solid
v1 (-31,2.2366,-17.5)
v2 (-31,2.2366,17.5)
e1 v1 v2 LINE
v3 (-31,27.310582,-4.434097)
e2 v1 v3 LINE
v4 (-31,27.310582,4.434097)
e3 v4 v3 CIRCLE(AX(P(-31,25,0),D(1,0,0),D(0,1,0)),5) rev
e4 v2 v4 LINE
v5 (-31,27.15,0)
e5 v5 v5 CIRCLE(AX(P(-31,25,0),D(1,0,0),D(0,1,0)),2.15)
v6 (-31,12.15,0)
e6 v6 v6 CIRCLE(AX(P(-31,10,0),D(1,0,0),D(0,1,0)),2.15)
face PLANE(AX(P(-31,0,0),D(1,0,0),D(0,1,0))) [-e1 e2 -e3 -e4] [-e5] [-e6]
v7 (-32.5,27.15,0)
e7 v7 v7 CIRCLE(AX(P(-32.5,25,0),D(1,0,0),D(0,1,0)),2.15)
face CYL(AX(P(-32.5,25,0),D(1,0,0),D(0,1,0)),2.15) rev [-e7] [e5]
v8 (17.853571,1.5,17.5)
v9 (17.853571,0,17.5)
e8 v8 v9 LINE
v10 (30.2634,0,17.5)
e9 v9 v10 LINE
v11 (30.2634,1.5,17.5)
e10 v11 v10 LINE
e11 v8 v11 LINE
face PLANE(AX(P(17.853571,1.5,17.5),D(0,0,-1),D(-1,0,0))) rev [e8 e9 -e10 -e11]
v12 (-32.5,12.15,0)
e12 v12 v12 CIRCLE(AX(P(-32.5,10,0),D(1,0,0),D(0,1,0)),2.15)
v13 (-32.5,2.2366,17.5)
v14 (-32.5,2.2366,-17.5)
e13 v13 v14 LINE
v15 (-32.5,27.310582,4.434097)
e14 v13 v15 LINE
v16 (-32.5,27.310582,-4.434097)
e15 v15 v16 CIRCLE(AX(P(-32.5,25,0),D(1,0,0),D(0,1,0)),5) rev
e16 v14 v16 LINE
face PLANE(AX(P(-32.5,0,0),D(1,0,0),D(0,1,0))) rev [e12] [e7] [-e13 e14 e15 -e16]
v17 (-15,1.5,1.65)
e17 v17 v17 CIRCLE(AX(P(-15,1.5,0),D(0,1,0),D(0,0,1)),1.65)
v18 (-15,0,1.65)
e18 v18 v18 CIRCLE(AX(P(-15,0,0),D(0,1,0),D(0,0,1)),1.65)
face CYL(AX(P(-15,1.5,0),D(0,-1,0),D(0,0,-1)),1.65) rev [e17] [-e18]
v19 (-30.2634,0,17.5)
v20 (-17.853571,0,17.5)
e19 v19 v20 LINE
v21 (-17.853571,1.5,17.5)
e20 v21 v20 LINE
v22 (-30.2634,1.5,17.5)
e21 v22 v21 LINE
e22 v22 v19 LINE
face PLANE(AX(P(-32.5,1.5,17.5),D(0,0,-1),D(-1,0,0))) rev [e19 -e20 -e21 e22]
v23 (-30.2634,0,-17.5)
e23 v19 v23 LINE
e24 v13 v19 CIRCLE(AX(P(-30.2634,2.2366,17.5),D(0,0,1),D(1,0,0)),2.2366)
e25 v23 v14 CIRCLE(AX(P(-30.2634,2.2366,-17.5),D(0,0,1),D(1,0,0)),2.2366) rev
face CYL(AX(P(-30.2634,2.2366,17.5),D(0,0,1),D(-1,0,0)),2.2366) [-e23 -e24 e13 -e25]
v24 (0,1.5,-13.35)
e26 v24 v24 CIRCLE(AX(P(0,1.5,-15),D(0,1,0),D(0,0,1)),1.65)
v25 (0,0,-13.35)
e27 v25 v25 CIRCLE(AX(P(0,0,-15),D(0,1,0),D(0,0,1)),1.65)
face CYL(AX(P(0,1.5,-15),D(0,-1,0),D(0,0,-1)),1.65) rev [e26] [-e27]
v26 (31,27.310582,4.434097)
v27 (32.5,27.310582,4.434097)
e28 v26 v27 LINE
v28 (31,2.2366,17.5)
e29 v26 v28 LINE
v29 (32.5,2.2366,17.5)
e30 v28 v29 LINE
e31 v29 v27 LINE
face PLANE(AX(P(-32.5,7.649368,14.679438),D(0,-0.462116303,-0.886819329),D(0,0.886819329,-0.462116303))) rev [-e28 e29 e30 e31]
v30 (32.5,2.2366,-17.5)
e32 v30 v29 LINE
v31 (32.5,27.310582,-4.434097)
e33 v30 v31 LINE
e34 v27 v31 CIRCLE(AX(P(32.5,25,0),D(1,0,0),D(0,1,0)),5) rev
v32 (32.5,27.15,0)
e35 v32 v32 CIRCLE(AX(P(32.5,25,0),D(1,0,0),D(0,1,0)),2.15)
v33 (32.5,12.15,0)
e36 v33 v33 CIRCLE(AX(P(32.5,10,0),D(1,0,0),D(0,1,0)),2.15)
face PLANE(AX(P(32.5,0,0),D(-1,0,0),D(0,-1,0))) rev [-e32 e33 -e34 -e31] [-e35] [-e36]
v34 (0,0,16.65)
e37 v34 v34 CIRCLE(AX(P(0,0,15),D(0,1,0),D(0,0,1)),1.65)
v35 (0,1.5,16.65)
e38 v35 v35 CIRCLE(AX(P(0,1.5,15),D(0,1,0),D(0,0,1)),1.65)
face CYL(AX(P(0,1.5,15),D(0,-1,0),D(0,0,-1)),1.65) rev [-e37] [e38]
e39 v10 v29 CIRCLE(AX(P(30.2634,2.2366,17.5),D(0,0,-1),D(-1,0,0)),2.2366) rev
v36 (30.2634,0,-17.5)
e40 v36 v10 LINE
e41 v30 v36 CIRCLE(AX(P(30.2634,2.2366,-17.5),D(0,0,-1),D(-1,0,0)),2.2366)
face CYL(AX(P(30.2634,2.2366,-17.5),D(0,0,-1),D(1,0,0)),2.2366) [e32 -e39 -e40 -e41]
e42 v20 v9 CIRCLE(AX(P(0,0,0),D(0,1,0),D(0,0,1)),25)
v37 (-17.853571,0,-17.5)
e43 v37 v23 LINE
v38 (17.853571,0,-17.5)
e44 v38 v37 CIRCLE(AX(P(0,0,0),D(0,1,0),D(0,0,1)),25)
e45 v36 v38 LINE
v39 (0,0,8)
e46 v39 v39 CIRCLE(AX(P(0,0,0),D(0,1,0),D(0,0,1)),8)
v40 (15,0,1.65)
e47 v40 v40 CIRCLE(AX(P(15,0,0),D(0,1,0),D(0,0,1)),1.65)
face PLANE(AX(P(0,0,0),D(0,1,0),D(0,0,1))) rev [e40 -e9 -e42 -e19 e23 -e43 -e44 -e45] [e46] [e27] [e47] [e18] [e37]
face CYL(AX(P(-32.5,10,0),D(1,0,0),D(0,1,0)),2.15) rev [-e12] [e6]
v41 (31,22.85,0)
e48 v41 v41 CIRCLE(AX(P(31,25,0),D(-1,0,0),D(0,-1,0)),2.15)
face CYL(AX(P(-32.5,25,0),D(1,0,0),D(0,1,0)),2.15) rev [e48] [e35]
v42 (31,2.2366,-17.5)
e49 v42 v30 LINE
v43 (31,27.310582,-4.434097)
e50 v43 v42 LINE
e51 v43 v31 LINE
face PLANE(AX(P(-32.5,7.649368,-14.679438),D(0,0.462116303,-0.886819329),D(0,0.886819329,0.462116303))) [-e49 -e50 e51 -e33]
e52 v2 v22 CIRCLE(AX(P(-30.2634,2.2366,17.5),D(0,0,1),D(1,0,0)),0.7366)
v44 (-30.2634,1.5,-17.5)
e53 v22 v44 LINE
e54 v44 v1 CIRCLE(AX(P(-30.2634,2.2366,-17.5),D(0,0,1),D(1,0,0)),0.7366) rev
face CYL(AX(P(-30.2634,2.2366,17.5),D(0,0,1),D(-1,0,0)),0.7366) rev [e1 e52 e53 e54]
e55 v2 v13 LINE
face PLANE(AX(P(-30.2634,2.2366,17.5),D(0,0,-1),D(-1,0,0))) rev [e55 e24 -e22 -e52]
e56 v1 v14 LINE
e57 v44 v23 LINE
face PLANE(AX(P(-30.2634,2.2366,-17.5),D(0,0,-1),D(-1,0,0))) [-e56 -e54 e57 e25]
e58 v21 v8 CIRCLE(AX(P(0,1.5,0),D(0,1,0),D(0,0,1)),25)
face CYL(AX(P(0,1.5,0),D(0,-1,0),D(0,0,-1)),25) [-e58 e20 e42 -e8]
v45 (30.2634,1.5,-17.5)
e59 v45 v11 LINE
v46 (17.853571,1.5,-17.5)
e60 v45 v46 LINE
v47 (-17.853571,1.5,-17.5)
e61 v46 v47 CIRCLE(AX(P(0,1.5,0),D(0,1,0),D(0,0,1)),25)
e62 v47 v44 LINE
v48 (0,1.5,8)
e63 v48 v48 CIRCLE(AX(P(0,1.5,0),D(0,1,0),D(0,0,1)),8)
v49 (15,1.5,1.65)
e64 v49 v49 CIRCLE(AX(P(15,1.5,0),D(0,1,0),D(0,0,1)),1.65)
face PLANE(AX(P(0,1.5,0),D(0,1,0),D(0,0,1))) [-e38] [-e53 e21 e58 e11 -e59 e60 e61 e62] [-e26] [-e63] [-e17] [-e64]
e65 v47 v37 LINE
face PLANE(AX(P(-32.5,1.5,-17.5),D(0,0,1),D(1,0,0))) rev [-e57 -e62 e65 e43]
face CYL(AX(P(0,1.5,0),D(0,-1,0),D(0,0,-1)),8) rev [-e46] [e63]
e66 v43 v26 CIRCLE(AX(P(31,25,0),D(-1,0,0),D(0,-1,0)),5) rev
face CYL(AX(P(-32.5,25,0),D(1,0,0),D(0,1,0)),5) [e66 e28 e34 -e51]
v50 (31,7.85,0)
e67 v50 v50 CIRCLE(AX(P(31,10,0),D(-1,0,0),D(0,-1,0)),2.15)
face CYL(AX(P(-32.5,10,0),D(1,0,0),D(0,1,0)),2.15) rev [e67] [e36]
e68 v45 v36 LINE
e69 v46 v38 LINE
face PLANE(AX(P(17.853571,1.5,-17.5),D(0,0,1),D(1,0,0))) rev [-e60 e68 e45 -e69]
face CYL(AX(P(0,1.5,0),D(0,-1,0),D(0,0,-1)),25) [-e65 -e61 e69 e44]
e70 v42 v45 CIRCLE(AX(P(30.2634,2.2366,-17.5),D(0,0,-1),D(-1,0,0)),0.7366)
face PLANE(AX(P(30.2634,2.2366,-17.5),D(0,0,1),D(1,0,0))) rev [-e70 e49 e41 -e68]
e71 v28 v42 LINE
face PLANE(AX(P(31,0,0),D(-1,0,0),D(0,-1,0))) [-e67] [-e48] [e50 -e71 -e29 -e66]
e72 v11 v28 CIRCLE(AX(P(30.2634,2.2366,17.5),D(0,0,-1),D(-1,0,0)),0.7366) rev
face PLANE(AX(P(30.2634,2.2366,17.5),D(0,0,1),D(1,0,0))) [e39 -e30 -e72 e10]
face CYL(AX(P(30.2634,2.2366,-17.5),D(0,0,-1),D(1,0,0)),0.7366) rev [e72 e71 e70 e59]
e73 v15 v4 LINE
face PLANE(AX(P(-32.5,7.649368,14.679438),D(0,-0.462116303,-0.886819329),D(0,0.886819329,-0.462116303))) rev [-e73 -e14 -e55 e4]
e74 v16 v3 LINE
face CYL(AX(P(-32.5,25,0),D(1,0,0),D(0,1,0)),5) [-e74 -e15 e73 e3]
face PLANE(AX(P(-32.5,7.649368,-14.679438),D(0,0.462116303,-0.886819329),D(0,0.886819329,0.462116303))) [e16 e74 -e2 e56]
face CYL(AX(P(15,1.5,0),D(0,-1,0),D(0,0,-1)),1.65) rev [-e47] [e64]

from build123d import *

# Parameters (mm, degrees)
SKETCH_6_R                         = 8
SKETCH_6_R_2                       = 1.65
SM_BASE_FLANGE_2_DEPTH             = 1.5
SM_EDGE_FLANGE_1_STRIP_W           = 7.4732
SM_EDGE_FLANGE_1_STRIP_H           = 1.5
SM_EDGE_FLANGE_1_STRIP_CUT_DEPTH   = 35
SM_EDGE_FLANGE_1_STRIP_2_W         = 7.4732
SM_EDGE_FLANGE_1_STRIP_2_H         = 1.5
SM_EDGE_FLANGE_1_STRIP_CUT_2_DEPTH = 35
SM_EDGE_FLANGE_1_DEPTH             = 35
SM_EDGE_FLANGE_1_BEND_DEPTH        = 35
CUT_EXTRUDE_1_DEPTH                = 76.828754441


# Sheet-metal steps are written as plain solids
with BuildPart() as part:
    # 草图6 → 基体-法兰2 (new body)
    with BuildSketch(Plane(origin=(0, 0, 0), x_dir=(1, 0, 0), z_dir=(0, 1, 0))):
        with BuildLine():
            Line((17.853571071, -17.5), (32.5, -17.5))
            Line((32.5, -17.5), (32.5, 17.5))
            Line((32.5, 17.5), (17.853571071, 17.5))
            ThreePointArc((17.853571071, 17.5), (0, 25), (-17.853571071, 17.5))
            Line((-17.853571071, 17.5), (-32.5, 17.5))
            Line((-32.5, 17.5), (-32.5, -17.5))
            Line((-32.5, -17.5), (-17.853571071, -17.5))
            ThreePointArc((-17.853571071, -17.5), (0, -25), (17.853571071, -17.5))
        make_face()
        with Locations(Location((0, 0, 0), (0, 0, 270))):
            Circle(SKETCH_6_R, mode=Mode.SUBTRACT)
        with Locations(Location((0, 15, 0), (0, 0, 270))):
            Circle(SKETCH_6_R_2, mode=Mode.SUBTRACT)
        with Locations(Location((-15, 0, 0), (0, 0, 270))):
            Circle(SKETCH_6_R_2, mode=Mode.SUBTRACT)
        with Locations(Location((0, -15, 0), (0, 0, 270))):
            Circle(SKETCH_6_R_2, mode=Mode.SUBTRACT)
        with Locations(Location((15, 0, 0), (0, 0, 270))):
            Circle(SKETCH_6_R_2, mode=Mode.SUBTRACT)
    extrude(amount=SM_BASE_FLANGE_2_DEPTH)

    # 边线-法兰1 strip (across the edge) → 边线-法兰1 strip cut (cut)
    with BuildSketch(Plane(origin=(-32.5, 1.5, -17.5), x_dir=(1, 0, 0), z_dir=(0, 0, 1))):
        with Locations((-1.5, -0.75)):
            Rectangle(SM_EDGE_FLANGE_1_STRIP_W, SM_EDGE_FLANGE_1_STRIP_H)
    extrude(amount=SM_EDGE_FLANGE_1_STRIP_CUT_DEPTH, mode=Mode.SUBTRACT)

    # 边线-法兰1 strip 2 (across the edge) → 边线-法兰1 strip cut 2 (cut)
    with BuildSketch(Plane(origin=(32.5, 1.5, 17.5), x_dir=(-1, 0, 0), z_dir=(0, 0, -1))):
        with Locations((-1.5, -0.75)):
            Rectangle(SM_EDGE_FLANGE_1_STRIP_2_W, SM_EDGE_FLANGE_1_STRIP_2_H)
    extrude(amount=SM_EDGE_FLANGE_1_STRIP_CUT_2_DEPTH, mode=Mode.SUBTRACT)

    # 边线-法兰1 section (across the edge) → 边线-法兰1 (add)
    with BuildSketch(Plane(origin=(-32.5, 1.5, -17.5), x_dir=(1, 0, 0), z_dir=(0, 0, 1))):
        with BuildLine():
            Line((0, 0.7366), (0, 28.5))
            Line((0, 28.5), (1.5, 28.5))
            Line((1.5, 28.5), (1.5, 0.7366))
            ThreePointArc((1.5, 0.7366), (1.715745145, 0.215745145), (2.2366, 0))
            Line((2.2366, 0), (2.2366, -1.5))
            ThreePointArc((2.2366, -1.5), (0.655084973, -0.844915027), (0, 0.7366))
        make_face()
    extrude(amount=SM_EDGE_FLANGE_1_DEPTH)

    # 边线-法兰1 section 2 (across the edge) → 边线-法兰1 bend (add)
    with BuildSketch(Plane(origin=(32.5, 1.5, 17.5), x_dir=(-1, 0, 0), z_dir=(0, 0, -1))):
        with BuildLine():
            Line((0, 0.7366), (0, 28.5))
            Line((0, 28.5), (1.5, 28.5))
            Line((1.5, 28.5), (1.5, 0.7366))
            ThreePointArc((1.5, 0.7366), (1.715745145, 0.215745145), (2.2366, 0))
            Line((2.2366, 0), (2.2366, -1.5))
            ThreePointArc((2.2366, -1.5), (0.655084973, -0.844915027), (0, 0.7366))
        make_face()
    extrude(amount=SM_EDGE_FLANGE_1_BEND_DEPTH)

    # 草图18 → 切除-拉伸1 (cut, through all)
    with BuildSketch(Plane(origin=(32.5, 0, 0), x_dir=(0, 0, -1), z_dir=(1, 0, 0))):
        with BuildLine():
            Line((-17.5, 30), (-17.5, 2.2366))
            Line((-17.5, 2.2366), (-4.434096645, 27.310581516))
            ThreePointArc((-4.434096645, 27.310581516), (-2.592980179, 29.275096933), (0, 30))
            Line((0, 30), (-17.5, 30))
        make_face()
        with BuildLine():
            Line((17.5, 30), (0, 30))
            ThreePointArc((0, 30), (2.592980179, 29.275096933), (4.434096645, 27.310581516))
            Line((4.434096645, 27.310581516), (17.5, 2.2366))
            Line((17.5, 2.2366), (17.5, 30))
        make_face()
        with BuildLine():
            ThreePointArc((2.15, 25), (1.52027958, 26.52027958), (0, 27.15))
            Line((0, 27.15), (0, 22.85))
            ThreePointArc((0, 22.85), (1.52027958, 23.47972042), (2.15, 25))
        make_face()
        with BuildLine():
            Line((0, 22.85), (0, 27.15))
            ThreePointArc((0, 27.15), (-2.15, 25), (0, 22.85))
        make_face()
        with BuildLine():
            ThreePointArc((2.15, 10), (1.52027958, 11.52027958), (0, 12.15))
            Line((0, 12.15), (0, 7.85))
            ThreePointArc((0, 7.85), (1.52027958, 8.47972042), (2.15, 10))
        make_face()
        with BuildLine():
            Line((0, 7.85), (0, 12.15))
            ThreePointArc((0, 12.15), (-2.15, 10), (0, 7.85))
        make_face()
    extrude(amount=-CUT_EXTRUDE_1_DEPTH, mode=Mode.SUBTRACT)


solid = part.part
